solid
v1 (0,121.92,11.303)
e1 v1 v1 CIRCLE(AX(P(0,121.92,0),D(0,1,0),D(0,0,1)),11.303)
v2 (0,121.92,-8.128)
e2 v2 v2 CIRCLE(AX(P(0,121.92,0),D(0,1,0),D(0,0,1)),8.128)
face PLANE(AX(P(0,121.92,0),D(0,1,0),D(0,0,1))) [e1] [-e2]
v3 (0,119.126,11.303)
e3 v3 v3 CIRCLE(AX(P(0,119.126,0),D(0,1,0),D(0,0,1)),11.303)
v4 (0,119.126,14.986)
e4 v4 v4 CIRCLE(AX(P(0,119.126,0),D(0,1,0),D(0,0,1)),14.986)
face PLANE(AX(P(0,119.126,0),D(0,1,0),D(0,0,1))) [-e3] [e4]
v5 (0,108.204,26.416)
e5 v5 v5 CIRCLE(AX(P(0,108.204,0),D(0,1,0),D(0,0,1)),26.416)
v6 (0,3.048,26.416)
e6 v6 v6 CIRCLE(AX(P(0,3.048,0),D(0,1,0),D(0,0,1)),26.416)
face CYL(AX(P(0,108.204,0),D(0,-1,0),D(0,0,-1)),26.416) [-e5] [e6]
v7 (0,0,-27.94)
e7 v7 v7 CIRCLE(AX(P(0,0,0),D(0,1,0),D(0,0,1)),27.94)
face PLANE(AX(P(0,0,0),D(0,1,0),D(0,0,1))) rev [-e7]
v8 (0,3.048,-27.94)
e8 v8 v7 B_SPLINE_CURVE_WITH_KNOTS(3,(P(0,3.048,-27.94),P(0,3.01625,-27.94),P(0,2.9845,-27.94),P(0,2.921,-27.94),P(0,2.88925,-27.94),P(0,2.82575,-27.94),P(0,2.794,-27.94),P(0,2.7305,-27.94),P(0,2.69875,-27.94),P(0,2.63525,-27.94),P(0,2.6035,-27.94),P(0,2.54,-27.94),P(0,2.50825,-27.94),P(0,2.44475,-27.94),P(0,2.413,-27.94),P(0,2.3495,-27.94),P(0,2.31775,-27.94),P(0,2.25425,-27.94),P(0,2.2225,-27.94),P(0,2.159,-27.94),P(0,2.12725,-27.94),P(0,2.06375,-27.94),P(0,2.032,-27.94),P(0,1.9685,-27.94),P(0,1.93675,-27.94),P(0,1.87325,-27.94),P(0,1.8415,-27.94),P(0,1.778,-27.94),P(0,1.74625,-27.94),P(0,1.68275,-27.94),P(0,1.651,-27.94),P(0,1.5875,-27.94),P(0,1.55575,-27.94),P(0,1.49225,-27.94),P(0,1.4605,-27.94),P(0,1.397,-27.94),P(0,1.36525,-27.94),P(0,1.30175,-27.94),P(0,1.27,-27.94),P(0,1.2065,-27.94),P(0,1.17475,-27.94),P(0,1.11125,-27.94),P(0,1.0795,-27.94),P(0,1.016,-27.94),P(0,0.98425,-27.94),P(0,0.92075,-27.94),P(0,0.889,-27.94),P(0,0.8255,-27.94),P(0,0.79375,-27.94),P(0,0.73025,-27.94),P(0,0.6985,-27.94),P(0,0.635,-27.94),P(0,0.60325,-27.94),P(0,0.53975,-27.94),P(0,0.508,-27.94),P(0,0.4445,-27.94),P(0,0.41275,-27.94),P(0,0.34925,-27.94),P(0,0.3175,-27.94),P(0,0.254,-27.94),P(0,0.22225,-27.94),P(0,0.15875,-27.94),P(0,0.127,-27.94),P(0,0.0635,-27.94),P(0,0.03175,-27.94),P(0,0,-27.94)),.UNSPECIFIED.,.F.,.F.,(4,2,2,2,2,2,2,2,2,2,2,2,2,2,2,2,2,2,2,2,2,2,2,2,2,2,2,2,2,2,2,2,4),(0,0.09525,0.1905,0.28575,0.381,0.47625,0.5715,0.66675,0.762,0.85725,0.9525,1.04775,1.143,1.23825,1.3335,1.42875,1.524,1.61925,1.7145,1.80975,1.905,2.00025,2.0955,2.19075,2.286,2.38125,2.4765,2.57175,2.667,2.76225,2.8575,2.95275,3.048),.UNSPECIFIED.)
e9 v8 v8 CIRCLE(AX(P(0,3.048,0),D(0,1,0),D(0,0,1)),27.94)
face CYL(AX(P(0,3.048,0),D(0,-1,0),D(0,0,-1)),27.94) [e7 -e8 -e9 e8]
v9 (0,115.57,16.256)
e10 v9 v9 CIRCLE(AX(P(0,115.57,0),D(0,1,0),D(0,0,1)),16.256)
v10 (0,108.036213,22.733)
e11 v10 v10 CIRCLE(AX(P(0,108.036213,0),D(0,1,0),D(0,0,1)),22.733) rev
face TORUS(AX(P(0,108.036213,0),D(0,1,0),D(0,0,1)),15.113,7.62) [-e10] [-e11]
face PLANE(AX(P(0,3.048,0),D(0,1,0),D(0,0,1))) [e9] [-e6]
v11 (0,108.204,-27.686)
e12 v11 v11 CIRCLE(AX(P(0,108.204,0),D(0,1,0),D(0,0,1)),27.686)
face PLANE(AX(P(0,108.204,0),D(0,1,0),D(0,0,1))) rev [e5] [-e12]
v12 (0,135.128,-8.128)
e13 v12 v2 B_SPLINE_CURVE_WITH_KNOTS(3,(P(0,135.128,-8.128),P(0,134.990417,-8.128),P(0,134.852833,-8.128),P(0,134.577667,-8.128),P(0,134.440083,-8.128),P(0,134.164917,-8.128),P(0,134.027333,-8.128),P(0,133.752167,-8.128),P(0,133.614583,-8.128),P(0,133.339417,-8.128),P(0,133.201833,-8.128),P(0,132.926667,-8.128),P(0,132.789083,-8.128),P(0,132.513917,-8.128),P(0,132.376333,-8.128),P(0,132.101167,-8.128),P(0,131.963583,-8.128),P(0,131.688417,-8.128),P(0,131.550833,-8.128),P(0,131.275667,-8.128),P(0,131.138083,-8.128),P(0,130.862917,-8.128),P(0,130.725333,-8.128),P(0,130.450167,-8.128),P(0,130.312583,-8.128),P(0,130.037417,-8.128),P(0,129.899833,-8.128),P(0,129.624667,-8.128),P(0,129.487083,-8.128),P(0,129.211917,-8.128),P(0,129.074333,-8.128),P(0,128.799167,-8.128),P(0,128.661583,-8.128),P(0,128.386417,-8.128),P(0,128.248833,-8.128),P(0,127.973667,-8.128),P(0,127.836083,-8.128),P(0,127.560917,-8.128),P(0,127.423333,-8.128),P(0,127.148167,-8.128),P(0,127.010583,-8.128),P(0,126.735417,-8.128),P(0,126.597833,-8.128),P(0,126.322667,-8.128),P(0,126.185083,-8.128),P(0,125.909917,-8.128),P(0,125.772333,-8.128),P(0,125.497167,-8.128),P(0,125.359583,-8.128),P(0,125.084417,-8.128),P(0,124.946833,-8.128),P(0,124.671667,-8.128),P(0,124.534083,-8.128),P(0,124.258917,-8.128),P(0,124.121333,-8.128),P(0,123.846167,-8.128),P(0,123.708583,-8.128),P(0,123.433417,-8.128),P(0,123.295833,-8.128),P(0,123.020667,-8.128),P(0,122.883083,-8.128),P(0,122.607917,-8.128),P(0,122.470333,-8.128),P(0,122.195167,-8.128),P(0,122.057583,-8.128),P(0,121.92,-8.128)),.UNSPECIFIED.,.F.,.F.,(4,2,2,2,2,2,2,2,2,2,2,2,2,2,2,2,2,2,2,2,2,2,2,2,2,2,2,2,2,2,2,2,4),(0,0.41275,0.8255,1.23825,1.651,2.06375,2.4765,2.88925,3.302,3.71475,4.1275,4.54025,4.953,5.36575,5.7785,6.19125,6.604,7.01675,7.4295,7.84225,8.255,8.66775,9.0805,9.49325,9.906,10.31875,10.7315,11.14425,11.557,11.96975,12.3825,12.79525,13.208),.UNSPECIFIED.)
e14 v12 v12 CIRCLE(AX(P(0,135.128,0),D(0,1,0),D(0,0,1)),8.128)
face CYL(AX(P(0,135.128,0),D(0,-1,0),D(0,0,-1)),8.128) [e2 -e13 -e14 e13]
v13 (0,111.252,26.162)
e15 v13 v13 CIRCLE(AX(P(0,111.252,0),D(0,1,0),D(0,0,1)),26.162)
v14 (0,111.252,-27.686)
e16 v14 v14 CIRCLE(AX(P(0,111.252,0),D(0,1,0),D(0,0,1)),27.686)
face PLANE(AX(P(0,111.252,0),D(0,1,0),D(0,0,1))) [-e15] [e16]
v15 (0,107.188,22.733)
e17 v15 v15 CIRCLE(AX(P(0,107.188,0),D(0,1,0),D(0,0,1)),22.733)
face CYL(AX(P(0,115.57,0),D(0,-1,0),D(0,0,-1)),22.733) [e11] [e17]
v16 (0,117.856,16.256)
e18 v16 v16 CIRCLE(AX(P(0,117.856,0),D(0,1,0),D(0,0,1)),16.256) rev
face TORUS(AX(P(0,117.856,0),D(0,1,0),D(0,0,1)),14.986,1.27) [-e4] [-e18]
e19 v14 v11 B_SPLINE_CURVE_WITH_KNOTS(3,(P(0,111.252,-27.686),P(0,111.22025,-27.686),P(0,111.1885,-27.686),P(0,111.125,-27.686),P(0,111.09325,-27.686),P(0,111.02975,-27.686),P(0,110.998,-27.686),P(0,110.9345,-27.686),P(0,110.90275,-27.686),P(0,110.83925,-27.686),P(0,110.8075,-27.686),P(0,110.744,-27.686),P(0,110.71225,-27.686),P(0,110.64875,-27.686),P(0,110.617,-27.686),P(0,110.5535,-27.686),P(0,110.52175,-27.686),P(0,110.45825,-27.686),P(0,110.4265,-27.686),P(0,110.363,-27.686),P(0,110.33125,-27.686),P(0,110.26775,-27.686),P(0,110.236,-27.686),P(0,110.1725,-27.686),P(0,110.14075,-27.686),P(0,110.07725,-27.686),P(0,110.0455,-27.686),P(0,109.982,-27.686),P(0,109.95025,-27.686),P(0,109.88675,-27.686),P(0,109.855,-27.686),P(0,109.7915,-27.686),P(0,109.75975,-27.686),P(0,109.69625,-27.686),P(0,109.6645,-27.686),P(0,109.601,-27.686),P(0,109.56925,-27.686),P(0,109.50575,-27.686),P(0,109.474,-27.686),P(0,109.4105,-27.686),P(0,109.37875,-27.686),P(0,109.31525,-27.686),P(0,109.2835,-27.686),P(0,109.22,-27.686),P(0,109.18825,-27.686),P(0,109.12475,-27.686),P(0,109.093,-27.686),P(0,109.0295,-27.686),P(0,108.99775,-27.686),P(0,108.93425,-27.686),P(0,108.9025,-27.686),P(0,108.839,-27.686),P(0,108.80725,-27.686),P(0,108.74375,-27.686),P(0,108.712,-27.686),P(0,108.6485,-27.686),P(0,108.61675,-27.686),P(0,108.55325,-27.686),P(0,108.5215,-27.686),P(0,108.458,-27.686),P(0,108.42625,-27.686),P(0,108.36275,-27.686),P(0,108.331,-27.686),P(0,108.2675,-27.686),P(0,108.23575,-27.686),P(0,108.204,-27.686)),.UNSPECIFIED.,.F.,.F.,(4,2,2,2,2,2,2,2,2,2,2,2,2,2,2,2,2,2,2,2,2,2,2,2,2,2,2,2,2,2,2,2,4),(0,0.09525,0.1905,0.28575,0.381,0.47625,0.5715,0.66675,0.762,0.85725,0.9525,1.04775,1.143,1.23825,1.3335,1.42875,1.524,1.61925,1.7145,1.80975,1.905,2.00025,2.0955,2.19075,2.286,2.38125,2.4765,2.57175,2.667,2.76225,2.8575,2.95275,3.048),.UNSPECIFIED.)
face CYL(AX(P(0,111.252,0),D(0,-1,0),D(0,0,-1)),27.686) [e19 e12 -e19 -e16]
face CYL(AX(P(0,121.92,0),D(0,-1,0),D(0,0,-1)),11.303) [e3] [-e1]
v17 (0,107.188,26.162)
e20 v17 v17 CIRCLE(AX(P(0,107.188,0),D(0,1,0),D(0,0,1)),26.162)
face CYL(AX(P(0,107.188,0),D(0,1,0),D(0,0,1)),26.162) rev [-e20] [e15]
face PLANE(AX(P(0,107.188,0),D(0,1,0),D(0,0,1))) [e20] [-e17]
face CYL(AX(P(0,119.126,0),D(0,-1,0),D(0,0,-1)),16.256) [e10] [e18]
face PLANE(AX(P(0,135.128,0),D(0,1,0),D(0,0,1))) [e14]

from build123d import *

# Parameters (mm, degrees)
SKETCH1_R           = 27.94
BOSS_EXTRUDE1_DEPTH = 3.048
SKETCH2_R           = 26.416
BOSS_EXTRUDE2_DEPTH = 105.156
SKETCH3_R           = 27.686
BOSS_EXTRUDE3_DEPTH = 3.048
SKETCH4_R           = 26.162
CUT_EXTRUDE1_DEPTH  = 4.064
SKETCH5_R           = 22.733
BOSS_EXTRUDE4_DEPTH = 8.382
SKETCH6_R           = 16.256
BOSS_EXTRUDE5_DEPTH = 3.556
SKETCH7_R           = 11.303
BOSS_EXTRUDE6_DEPTH = 2.794
SKETCH8_R           = 8.128
BOSS_EXTRUDE7_DEPTH = 13.208
FILLET1_R           = 7.62
FILLET2_R           = 1.27


with BuildPart() as part:
    # Sketch1 → Boss-Extrude1 (new body)
    with BuildSketch(Plane(origin=(0, 0, 0), x_dir=(1, 0, 0), z_dir=(0, 1, 0))):
        with Locations(Location((0, 0, 0), (0, 0, 90))):
            Circle(SKETCH1_R)
    extrude(amount=BOSS_EXTRUDE1_DEPTH)

    # Sketch2 → Boss-Extrude2 (add)
    with BuildSketch(Plane(origin=(0, 3.048, 0), x_dir=(1, 0, 0), z_dir=(0, 1, 0))):
        with Locations(Location((0, 0, 0), (0, 0, 270))):
            Circle(SKETCH2_R)
    extrude(amount=BOSS_EXTRUDE2_DEPTH)

    # Sketch3 → Boss-Extrude3 (add)
    with BuildSketch(Plane(origin=(0, 108.204, 0), x_dir=(1, 0, 0), z_dir=(0, 1, 0))):
        with Locations(Location((0, 0, 0), (0, 0, 90))):
            Circle(SKETCH3_R)
    extrude(amount=BOSS_EXTRUDE3_DEPTH)

    # Sketch4 → Cut-Extrude1 (cut)
    with BuildSketch(Plane(origin=(0, 111.252, 0), x_dir=(1, 0, 0), z_dir=(0, 1, 0))):
        with Locations(Location((0, 0, 0), (0, 0, 270))):
            Circle(SKETCH4_R)
    extrude(amount=-CUT_EXTRUDE1_DEPTH, mode=Mode.SUBTRACT)

    # Sketch5 → Boss-Extrude4 (add)
    with BuildSketch(Plane(origin=(0, 107.188, 0), x_dir=(1, 0, 0), z_dir=(0, 1, 0))):
        with Locations(Location((0, 0, 0), (0, 0, 270))):
            Circle(SKETCH5_R)
    extrude(amount=BOSS_EXTRUDE4_DEPTH)

    # Sketch6 → Boss-Extrude5 (add)
    with BuildSketch(Plane(origin=(0, 115.57, 0), x_dir=(1, 0, 0), z_dir=(0, 1, 0))):
        with Locations(Location((0, 0, 0), (0, 0, 270))):
            Circle(SKETCH6_R)
    extrude(amount=BOSS_EXTRUDE5_DEPTH)

    # Sketch7 → Boss-Extrude6 (add)
    with BuildSketch(Plane(origin=(0, 119.126, 0), x_dir=(1, 0, 0), z_dir=(0, 1, 0))):
        with Locations(Location((0, 0, 0), (0, 0, 270))):
            Circle(SKETCH7_R)
    extrude(amount=BOSS_EXTRUDE6_DEPTH)

    # Sketch8 → Boss-Extrude7 (add)
    with BuildSketch(Plane(origin=(0, 121.92, 0), x_dir=(1, 0, 0), z_dir=(0, 1, 0))):
        with Locations(Location((0, 0, 0), (0, 0, 90))):
            Circle(SKETCH8_R)
    extrude(amount=BOSS_EXTRUDE7_DEPTH)

    # Fillet1
    # the kernel refuses this fillet: 7.62 mm, written as the material it takes off along each edge
    with BuildSketch(Plane(origin=(0, 115.57, 0), x_dir=(0, 0, 1), z_dir=(-1, 0, 0))) as fillet1_piece_1:
        with BuildLine():
            CenterArc((15.113, -7.533787295), FILLET1_R, 0, 81.373073441)
            Line((16.256, 0), (16.27886, 0.150675746))
            ThreePointArc((16.27886, 0.150675746), (19.4945, 0.1524), (22.733, 0.1524))
            Line((22.733, 0.1524), (22.8854, 0))
            Line((22.8854, 0), (22.8854, -7.533787295))
            Line((22.8854, -7.533787295), (22.733, -7.533787295))
        make_face()
    revolve(axis=Axis((0, 115.57, 0), (0, 1, 0)), mode=Mode.SUBTRACT)

    # Fillet2
    fillet2_edges = [part.edges().sort_by_distance(p)[0] for p in [
        (0, 119.126, -16.256),
    ]]
    fillet(fillet2_edges, radius=FILLET2_R)


solid = part.part
